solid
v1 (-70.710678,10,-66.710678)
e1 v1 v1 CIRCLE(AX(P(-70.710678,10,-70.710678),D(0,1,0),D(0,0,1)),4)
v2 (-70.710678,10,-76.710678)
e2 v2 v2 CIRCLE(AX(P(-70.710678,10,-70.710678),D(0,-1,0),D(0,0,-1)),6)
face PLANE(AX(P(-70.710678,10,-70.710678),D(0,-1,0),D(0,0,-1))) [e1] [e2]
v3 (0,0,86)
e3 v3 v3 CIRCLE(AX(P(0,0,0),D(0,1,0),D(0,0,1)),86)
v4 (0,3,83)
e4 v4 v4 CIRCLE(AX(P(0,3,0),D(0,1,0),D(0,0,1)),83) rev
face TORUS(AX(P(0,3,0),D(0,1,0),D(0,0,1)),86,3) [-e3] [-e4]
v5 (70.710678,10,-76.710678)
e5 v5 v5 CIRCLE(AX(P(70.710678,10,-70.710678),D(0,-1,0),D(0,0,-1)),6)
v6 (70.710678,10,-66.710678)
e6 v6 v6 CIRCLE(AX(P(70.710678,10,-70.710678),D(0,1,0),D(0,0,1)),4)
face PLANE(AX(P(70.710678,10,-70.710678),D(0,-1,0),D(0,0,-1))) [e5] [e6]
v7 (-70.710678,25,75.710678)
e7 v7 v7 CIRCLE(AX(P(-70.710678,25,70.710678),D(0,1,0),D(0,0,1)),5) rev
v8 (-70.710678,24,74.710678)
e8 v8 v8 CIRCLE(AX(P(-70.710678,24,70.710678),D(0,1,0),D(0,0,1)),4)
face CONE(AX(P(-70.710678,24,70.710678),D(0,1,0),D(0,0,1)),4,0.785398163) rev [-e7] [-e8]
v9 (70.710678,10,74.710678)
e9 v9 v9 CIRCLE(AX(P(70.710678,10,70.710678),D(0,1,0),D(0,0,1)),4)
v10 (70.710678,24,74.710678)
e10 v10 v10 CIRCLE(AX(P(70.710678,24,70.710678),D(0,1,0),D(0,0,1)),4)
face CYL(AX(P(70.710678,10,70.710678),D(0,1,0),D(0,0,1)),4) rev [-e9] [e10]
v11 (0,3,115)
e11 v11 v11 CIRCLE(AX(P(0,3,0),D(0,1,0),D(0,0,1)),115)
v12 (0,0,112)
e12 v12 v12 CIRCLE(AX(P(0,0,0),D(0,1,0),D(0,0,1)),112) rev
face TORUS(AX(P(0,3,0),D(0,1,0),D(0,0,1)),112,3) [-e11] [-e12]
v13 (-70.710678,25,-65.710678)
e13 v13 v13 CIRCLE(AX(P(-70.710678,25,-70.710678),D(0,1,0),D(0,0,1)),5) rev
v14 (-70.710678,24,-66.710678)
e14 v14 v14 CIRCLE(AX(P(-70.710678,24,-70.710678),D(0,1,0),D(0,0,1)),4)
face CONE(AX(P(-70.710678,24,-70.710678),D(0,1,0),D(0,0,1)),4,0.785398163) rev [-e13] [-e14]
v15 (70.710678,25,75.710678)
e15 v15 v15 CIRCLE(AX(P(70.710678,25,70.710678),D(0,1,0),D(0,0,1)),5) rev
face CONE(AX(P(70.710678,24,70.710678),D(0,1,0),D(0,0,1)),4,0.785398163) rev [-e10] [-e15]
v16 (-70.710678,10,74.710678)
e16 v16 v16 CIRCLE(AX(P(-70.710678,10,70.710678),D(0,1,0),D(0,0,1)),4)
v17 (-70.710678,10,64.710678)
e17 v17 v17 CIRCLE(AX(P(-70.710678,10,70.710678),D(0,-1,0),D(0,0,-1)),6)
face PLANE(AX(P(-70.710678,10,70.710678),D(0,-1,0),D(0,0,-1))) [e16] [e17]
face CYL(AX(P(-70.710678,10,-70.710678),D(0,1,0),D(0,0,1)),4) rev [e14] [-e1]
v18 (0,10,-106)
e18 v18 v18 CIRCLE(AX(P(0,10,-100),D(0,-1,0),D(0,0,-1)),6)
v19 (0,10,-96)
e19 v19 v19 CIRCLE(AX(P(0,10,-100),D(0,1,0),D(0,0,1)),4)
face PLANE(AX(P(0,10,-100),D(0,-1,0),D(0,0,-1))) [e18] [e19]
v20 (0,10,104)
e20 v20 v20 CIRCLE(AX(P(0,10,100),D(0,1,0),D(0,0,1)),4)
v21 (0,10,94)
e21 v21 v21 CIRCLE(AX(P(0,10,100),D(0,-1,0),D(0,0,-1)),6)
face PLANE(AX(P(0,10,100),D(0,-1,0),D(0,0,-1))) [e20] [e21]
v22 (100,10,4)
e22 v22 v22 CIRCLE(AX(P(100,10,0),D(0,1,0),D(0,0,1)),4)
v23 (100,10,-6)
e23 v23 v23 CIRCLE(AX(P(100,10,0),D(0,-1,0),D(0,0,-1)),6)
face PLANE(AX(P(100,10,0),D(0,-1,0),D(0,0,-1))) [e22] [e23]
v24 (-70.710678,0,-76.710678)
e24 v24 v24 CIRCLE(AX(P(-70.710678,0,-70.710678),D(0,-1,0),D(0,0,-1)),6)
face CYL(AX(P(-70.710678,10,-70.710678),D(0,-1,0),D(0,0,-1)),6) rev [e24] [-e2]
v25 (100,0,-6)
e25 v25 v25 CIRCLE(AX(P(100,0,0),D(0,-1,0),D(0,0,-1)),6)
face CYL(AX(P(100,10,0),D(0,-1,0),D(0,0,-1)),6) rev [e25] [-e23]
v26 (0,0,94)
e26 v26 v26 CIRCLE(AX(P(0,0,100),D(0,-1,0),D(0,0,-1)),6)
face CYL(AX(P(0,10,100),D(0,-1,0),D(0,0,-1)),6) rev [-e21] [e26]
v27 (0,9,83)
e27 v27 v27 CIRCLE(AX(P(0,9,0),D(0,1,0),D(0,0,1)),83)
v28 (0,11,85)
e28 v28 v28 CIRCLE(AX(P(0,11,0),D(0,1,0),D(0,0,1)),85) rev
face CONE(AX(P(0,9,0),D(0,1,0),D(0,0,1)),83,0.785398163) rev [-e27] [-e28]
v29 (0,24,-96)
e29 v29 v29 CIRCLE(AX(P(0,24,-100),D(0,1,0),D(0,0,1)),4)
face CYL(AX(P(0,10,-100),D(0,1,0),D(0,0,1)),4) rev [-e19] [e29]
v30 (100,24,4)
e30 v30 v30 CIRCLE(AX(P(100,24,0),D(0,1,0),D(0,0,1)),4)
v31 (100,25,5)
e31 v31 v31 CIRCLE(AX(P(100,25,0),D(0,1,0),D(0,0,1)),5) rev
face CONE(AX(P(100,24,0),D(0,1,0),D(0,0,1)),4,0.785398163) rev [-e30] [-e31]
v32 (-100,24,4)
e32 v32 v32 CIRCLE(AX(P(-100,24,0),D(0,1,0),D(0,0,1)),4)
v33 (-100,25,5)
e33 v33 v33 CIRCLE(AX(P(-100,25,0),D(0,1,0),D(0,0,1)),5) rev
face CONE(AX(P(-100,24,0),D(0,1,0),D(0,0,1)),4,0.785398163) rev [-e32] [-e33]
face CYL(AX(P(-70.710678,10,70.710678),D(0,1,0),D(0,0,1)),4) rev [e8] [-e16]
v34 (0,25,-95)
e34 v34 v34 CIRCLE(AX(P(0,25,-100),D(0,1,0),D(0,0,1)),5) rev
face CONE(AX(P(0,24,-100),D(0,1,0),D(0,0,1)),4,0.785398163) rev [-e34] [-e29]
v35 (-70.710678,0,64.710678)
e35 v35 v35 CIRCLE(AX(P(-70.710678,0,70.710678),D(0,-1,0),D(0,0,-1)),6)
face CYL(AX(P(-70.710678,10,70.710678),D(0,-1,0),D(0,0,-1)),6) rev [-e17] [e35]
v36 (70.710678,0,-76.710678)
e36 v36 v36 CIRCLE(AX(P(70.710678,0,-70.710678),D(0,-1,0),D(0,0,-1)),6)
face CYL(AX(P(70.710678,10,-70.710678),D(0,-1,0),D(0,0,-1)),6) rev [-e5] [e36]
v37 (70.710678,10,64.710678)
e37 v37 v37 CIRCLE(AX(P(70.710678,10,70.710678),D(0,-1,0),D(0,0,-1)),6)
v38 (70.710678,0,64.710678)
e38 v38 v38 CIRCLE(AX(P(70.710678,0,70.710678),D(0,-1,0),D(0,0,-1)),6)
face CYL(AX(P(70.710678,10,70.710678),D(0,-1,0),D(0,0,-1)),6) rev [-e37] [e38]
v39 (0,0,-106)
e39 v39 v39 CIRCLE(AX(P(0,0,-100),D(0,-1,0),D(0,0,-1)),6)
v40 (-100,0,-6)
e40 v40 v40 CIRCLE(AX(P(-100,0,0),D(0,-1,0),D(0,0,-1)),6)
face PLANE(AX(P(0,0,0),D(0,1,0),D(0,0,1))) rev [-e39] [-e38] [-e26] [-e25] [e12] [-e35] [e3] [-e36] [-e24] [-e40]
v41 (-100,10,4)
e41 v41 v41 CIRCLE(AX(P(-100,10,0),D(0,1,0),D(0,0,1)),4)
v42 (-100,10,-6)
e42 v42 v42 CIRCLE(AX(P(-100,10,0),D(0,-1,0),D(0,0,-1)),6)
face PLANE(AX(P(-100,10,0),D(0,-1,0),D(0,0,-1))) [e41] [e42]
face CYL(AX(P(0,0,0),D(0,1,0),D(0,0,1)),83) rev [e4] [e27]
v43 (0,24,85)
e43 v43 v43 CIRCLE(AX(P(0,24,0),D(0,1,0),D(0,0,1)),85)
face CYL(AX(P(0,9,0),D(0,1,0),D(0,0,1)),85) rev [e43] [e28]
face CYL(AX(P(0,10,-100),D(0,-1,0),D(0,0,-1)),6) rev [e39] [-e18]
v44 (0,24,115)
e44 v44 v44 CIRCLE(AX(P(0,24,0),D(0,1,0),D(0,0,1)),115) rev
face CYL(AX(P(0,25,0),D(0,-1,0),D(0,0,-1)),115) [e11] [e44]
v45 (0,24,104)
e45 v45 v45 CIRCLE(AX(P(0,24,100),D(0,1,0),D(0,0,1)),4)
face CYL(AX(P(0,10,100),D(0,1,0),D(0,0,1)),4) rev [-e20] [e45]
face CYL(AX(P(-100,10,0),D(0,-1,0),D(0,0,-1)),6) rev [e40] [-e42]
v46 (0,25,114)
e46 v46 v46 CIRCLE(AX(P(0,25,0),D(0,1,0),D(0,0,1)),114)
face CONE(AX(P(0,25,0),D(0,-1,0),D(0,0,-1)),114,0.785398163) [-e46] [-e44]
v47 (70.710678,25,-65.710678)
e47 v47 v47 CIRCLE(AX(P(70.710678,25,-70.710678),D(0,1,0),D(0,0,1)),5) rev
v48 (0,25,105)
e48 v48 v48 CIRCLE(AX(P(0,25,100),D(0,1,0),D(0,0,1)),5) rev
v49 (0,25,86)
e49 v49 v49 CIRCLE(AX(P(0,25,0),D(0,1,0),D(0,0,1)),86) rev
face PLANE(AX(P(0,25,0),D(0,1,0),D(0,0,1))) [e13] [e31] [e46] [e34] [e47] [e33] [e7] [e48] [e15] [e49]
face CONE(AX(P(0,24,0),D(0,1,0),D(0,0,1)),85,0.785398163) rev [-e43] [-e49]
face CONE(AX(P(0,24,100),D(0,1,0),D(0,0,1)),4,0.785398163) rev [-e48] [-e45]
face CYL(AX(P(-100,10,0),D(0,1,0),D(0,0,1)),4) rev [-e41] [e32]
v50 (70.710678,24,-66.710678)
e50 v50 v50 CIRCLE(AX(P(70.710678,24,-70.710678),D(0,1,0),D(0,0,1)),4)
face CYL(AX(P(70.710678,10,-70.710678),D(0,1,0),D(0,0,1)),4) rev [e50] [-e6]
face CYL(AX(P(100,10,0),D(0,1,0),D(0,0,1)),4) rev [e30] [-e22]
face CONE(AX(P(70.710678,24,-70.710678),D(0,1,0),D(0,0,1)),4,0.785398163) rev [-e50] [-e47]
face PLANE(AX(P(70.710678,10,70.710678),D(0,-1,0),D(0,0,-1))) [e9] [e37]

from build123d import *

# Parameters (mm, degrees)
SKETCH2_R           = 115
BOSS_EXTRUDE1_DEPTH = 25
SKETCH3_R           = 85
CUT_EXTRUDE1_DEPTH  = 16
SKETCH4_R           = 83
CUT_EXTRUDE2_DEPTH  = 164.419705054
CHAMFER3_SIZE       = 2
CHAMFER5_SIZE       = 1
FILLET1_R           = 3
SKETCH5_R           = 4
CUT_EXTRUDE3_DEPTH  = 15
SKETCH6_R           = 6
CUT_EXTRUDE4_DEPTH  = 10
CHAMFER6_SIZE       = 1


with BuildPart() as part:
    # Sketch2 → Boss-Extrude1 (new body)
    with BuildSketch(Plane(origin=(0, 0, 0), x_dir=(1, 0, 0), z_dir=(0, 1, 0))):
        with Locations(Location((0, 0, 0), (0, 0, 270))):
            Circle(SKETCH2_R)
    extrude(amount=BOSS_EXTRUDE1_DEPTH)

    # Sketch3 → Cut-Extrude1 (cut)
    with BuildSketch(Plane(origin=(0, 25, 0), x_dir=(1, 0, 0), z_dir=(0, 1, 0))):
        with Locations(Location((0, 0, 0), (0, 0, 270))):
            Circle(SKETCH3_R)
    extrude(amount=-CUT_EXTRUDE1_DEPTH, mode=Mode.SUBTRACT)

    # Sketch4 → Cut-Extrude2 (cut, through all)
    with BuildSketch(Plane(origin=(0, 9, 0), x_dir=(1, 0, 0), z_dir=(0, 1, 0))):
        with Locations(Location((0, 0, 0), (0, 0, 270))):
            Circle(SKETCH4_R)
    extrude(amount=-CUT_EXTRUDE2_DEPTH, mode=Mode.SUBTRACT)

    # Chamfer3
    chamfer3_edges = [part.edges().sort_by_distance(p)[0] for p in [
        (0, 9, -85),
    ]]
    chamfer(chamfer3_edges, length=CHAMFER3_SIZE - 0.0001)  # a hair under: the kernel refuses the full size

    # Chamfer5
    chamfer5_edges = [part.edges().sort_by_distance(p)[0] for p in [
        (0, 25, -115),
        (0, 25, -85),
    ]]
    chamfer(chamfer5_edges, length=CHAMFER5_SIZE)

    # Fillet1
    fillet1_edges = [part.edges().sort_by_distance(p)[0] for p in [
        (0, 0, -83),
        (0, 0, -115),
    ]]
    fillet(fillet1_edges, radius=FILLET1_R)

    # Sketch5 → Cut-Extrude3 (cut)
    with BuildSketch(Plane(origin=(0, 25, 0), x_dir=(1, 0, 0), z_dir=(0, 1, 0))):
        with Locations(Location((-100, 0, 0), (0, 0, 270))):
            Circle(SKETCH5_R)
        with Locations(Location((-70.710678119, 70.710678119, 0), (0, 0, 270))):
            Circle(SKETCH5_R)
        with Locations(Location((0, 100, 0), (0, 0, 270))):
            Circle(SKETCH5_R)
        with Locations(Location((70.710678119, 70.710678119, 0), (0, 0, 270))):
            Circle(SKETCH5_R)
        with Locations(Location((100, 0, 0), (0, 0, 270))):
            Circle(SKETCH5_R)
        with Locations(Location((70.710678119, -70.710678119, 0), (0, 0, 270))):
            Circle(SKETCH5_R)
        with Locations(Location((0, -100, 0), (0, 0, 270))):
            Circle(SKETCH5_R)
        with Locations(Location((-70.710678119, -70.710678119, 0), (0, 0, 270))):
            Circle(SKETCH5_R)
    extrude(amount=-CUT_EXTRUDE3_DEPTH, mode=Mode.SUBTRACT)

    # Sketch6 → Cut-Extrude4 (cut)
    with BuildSketch(Plane.XZ):
        with Locations(Location((-100, 0, 0), (0, 0, 270))):
            Circle(SKETCH6_R)
        with Locations(Location((-70.710678119, 70.710678119, 0), (0, 0, 270))):
            Circle(SKETCH6_R)
        with Locations(Location((0, 100, 0), (0, 0, 270))):
            Circle(SKETCH6_R)
        with Locations(Location((70.710678119, 70.710678119, 0), (0, 0, 270))):
            Circle(SKETCH6_R)
        with Locations(Location((100, 0, 0), (0, 0, 270))):
            Circle(SKETCH6_R)
        with Locations(Location((70.710678119, -70.710678119, 0), (0, 0, 270))):
            Circle(SKETCH6_R)
        with Locations(Location((0, -100, 0), (0, 0, 270))):
            Circle(SKETCH6_R)
        with Locations(Location((-70.710678119, -70.710678119, 0), (0, 0, 270))):
            Circle(SKETCH6_R)
    extrude(amount=-CUT_EXTRUDE4_DEPTH, mode=Mode.SUBTRACT)

    # Chamfer6
    chamfer6_edges = [part.edges().sort_by_distance(p)[0] for p in [
        (-100, 25, -4),
        (-70.710678119, 25, -74.710678119),
        (0, 25, -104),
        (70.710678119, 25, -74.710678119),
        (100, 25, -4),
        (70.710678119, 25, 66.710678119),
        (0, 25, 96),
        (-70.710678119, 25, 66.710678119),
    ]]
    chamfer(chamfer6_edges, length=CHAMFER6_SIZE)


solid = part.part
